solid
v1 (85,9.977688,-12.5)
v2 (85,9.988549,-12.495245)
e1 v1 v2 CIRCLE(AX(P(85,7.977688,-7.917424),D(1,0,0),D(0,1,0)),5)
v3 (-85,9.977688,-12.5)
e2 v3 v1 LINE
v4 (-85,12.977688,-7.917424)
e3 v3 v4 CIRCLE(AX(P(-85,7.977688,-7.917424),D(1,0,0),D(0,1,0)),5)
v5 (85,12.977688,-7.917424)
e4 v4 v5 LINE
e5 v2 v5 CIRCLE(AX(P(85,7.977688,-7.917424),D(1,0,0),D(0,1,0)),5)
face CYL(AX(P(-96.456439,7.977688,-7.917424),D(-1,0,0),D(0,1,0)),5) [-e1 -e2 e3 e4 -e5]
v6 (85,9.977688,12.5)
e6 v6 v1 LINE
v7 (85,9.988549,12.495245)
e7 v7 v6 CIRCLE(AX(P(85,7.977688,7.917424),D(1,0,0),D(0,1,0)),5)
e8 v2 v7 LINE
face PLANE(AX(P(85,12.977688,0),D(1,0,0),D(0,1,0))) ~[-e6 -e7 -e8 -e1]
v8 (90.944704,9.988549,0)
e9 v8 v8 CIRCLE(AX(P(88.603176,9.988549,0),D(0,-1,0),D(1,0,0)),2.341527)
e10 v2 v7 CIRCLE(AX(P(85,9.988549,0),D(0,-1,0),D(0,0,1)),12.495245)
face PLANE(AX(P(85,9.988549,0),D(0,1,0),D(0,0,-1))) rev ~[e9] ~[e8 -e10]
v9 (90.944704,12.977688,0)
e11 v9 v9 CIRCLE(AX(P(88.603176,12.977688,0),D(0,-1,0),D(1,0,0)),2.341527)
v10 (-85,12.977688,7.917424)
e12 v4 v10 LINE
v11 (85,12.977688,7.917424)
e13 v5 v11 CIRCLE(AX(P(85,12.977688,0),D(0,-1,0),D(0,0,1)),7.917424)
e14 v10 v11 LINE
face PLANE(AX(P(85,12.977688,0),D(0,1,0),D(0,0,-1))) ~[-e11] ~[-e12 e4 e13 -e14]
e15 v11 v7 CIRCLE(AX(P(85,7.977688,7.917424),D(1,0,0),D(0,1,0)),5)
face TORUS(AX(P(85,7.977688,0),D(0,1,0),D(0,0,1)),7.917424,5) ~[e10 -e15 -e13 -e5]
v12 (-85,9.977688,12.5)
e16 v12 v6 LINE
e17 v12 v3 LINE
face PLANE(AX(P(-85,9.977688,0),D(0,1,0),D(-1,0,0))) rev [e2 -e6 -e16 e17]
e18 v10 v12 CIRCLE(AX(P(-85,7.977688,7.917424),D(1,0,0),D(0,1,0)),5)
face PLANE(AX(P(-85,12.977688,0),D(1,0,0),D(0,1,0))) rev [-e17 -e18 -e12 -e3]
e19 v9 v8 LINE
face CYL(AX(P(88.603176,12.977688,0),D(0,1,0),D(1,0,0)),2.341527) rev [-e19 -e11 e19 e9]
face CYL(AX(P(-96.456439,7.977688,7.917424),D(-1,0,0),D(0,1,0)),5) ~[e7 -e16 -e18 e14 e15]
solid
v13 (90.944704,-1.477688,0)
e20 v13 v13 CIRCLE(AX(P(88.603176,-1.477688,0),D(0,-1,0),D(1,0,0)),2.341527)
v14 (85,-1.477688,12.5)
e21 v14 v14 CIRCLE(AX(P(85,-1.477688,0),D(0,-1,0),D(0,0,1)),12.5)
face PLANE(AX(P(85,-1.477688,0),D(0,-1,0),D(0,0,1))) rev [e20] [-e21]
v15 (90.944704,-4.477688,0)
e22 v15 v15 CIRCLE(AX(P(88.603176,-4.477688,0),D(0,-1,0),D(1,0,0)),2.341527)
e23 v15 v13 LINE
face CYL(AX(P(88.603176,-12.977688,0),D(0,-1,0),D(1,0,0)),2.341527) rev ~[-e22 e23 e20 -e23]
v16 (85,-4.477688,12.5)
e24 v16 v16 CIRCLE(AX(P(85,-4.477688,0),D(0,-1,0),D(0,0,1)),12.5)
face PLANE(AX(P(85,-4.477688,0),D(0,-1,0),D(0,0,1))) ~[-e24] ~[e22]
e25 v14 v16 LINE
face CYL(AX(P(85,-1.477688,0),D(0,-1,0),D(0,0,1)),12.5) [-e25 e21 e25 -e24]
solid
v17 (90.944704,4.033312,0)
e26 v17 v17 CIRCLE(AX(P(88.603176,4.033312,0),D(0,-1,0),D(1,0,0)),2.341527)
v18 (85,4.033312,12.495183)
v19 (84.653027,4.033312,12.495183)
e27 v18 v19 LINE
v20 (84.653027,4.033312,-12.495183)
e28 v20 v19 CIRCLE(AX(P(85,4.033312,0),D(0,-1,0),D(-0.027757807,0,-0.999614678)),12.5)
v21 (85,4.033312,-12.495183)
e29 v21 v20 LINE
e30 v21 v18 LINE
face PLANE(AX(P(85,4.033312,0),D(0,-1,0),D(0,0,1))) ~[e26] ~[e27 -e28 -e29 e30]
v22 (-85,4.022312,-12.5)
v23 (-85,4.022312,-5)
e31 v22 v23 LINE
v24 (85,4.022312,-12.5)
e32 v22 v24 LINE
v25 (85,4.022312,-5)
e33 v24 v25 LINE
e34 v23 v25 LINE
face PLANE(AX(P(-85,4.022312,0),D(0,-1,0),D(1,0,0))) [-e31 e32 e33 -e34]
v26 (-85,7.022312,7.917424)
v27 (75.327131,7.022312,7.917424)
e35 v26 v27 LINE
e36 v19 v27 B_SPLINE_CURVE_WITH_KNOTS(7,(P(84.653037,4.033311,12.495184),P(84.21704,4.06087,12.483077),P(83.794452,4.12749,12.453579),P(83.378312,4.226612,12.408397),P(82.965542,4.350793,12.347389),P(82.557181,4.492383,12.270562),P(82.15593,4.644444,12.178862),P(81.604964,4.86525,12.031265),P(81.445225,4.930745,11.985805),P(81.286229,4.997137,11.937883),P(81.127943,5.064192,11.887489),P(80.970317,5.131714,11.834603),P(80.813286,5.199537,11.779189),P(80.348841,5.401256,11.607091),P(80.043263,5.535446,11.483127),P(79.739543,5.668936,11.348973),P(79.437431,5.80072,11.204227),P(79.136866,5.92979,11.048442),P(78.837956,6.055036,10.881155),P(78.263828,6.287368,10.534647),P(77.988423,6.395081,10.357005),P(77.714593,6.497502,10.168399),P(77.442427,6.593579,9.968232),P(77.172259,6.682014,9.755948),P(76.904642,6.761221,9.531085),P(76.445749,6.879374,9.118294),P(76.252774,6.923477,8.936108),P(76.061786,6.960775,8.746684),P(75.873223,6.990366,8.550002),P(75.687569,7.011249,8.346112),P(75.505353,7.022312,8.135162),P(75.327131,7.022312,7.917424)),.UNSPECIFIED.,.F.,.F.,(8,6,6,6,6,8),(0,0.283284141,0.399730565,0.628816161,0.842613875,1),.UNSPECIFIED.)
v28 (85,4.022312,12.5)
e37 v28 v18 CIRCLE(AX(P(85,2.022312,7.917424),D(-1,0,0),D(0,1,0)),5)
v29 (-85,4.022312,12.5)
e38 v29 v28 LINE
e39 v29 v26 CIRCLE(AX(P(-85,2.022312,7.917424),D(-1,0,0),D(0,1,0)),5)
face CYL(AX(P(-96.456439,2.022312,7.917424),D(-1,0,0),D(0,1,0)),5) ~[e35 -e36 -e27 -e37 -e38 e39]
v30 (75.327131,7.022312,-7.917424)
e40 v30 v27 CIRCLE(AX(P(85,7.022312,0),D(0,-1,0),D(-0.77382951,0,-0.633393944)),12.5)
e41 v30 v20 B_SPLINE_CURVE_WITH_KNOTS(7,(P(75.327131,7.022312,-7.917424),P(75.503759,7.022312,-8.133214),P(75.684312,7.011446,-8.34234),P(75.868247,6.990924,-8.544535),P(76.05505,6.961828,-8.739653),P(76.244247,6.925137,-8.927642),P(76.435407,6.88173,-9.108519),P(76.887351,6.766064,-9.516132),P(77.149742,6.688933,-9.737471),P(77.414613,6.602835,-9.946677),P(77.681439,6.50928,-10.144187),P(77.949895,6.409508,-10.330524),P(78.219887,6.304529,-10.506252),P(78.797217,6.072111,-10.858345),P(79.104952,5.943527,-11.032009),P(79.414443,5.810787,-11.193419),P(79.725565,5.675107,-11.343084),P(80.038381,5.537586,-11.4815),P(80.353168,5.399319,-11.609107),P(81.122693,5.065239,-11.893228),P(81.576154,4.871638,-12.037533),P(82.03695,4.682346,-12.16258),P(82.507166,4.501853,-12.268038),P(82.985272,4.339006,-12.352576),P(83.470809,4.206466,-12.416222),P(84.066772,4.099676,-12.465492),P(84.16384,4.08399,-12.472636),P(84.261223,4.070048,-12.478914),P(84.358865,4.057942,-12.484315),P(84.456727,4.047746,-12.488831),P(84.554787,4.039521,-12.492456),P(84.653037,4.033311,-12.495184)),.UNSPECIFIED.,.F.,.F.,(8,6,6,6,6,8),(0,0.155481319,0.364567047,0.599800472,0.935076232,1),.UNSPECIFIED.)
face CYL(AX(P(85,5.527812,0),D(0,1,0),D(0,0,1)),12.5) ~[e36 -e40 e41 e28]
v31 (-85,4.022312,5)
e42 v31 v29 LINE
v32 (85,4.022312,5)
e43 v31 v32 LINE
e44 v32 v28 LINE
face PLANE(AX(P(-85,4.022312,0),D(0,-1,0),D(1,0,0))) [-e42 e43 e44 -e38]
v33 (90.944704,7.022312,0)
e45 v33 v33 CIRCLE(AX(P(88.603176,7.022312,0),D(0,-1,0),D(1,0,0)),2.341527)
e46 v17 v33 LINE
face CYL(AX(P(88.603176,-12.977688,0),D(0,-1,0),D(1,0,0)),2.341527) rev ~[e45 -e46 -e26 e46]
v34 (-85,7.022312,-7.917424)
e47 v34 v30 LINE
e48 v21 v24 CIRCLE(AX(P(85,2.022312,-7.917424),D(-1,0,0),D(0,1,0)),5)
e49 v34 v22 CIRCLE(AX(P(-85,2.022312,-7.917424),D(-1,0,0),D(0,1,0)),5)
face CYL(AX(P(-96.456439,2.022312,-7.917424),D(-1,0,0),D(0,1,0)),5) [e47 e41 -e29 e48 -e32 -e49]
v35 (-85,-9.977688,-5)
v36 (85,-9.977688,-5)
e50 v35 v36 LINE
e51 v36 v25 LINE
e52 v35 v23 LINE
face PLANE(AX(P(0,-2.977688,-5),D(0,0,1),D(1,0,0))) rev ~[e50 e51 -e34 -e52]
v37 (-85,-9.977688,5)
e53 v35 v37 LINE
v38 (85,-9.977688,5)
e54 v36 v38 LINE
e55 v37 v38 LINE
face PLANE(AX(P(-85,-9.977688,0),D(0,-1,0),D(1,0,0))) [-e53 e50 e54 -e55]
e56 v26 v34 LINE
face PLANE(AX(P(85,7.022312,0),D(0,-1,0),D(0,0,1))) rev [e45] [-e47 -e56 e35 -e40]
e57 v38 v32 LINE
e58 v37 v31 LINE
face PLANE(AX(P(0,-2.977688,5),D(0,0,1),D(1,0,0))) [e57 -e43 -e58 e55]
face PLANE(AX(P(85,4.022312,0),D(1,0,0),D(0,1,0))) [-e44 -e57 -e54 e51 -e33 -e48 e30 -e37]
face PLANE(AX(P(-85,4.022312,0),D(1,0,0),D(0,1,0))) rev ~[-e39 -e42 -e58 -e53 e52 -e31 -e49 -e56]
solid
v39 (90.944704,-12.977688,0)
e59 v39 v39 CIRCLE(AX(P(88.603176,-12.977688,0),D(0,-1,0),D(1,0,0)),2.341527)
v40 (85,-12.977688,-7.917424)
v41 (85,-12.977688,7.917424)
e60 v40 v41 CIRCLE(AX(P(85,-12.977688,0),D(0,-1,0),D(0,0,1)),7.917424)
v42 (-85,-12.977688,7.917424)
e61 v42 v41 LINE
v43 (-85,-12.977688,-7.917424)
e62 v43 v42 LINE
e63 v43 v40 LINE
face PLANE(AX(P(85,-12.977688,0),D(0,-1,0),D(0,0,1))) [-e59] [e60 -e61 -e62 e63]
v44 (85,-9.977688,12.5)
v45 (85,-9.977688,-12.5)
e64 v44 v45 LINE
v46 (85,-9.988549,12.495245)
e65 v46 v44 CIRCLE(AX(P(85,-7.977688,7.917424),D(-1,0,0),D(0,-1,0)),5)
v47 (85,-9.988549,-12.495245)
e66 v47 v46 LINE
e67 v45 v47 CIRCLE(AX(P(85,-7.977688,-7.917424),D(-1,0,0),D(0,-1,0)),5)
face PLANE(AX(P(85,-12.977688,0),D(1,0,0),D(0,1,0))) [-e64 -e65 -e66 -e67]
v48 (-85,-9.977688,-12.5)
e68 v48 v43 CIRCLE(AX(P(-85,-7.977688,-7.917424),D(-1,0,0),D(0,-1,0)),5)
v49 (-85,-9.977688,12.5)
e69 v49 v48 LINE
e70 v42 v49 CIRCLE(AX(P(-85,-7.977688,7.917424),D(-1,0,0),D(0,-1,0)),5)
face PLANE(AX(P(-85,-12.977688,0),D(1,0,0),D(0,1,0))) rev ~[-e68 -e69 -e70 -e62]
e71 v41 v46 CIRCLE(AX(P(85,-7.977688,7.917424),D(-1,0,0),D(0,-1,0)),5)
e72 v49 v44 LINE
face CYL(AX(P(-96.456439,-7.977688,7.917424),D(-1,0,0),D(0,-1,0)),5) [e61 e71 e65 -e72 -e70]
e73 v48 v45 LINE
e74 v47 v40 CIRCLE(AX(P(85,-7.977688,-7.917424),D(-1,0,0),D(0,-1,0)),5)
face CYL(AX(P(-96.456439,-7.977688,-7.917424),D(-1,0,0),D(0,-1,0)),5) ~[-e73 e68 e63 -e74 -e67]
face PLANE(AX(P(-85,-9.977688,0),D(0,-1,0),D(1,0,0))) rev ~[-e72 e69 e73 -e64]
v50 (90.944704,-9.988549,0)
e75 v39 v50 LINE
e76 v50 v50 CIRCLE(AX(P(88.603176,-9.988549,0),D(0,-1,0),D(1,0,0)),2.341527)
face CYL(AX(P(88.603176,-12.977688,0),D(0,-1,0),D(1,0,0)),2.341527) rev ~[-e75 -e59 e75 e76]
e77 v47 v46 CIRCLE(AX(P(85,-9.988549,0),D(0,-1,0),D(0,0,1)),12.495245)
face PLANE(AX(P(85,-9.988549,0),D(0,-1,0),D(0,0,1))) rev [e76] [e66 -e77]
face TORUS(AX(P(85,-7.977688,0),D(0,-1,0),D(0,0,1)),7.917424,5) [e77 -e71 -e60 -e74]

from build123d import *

# Parameters (mm, degrees)
F0_W          = 170
F0_H          = 3
F1_DEPTH      = 12.5
F0_H_2        = 14
F2_DEPTH      = 5
F3_DEPTH      = 12.5
F4_T1_DEPTH   = 192.9128784748
F4_2_T1_DEPTH = 192.9128784748
F5_W          = 2.989
F5_H          = 12.5
F5_W_2        = 1.5
F8_R          = 2.3415273596
F9_DEPTH      = 20.0010001


# Not quite as in the source:
# - a fillet or chamfer that OpenCascade refuses, or shapes differently, is made with other operations: its cross-section is extruded or revolved along the edge and cut away or added
# - a feature names something its author has since deleted; it is built from what else it names


with BuildPart() as f1:
    # F0 (on Top) → F1 (new body, symmetric)
    with BuildSketch(Plane.XY):
        with Locations((0, -11.4776883987)):
            Rectangle(F0_W, F0_H)
    extrude(amount=F1_DEPTH, both=True)

    # F4: fillet of radius 5 on 2 edges, made by hand

    # F4_s2 → F4_t1 (cut)
    with BuildSketch(Plane.YZ.offset(-96.4564392374)):
        with BuildLine():
            ThreePointArc((-12.9776883987, -7.917424305), (-12.1609885313, -10.6560370926), (-9.9776883987, -12.5))
            Line((-9.9776883987, -12.5), (-12.9776883987, -12.5))
            Line((-12.9776883987, -12.5), (-12.9776883987, -7.917424305))
        make_face()
        with BuildLine():
            ThreePointArc((-12.9776883987, 7.917424305), (-12.1609885313, 10.6560370926), (-9.9776883987, 12.5))
            Line((-9.9776883987, 12.5), (-12.9776883987, 12.5))
            Line((-12.9776883987, 12.5), (-12.9776883987, 7.917424305))
        make_face()
    extrude(amount=F4_T1_DEPTH, mode=Mode.SUBTRACT)

    # F5 (on face) → F6, piece 2 (revolve)
    with BuildSketch(Plane.YZ.offset(85)):
        with BuildLine():
            Line((-9.9885491654, 0), (-9.9885491654, 12.4952446354))
            ThreePointArc((-9.9885491654, 12.4952446354), (-12.1642325483, 10.6510753587), (-12.9776883987, 7.917424305))
            Line((-12.9776883987, 7.917424305), (-12.9776883987, 0))
            Line((-12.9776883987, 0), (-12.6429592585, 0))
            Line((-12.6429592585, 0), (-9.9885491654, 0))
        make_face()
    revolve(axis=Axis((85, -2.9776883987, 0), (0, -1, 0)))


with BuildPart() as f2:
    # F0 (on Top) → F2 (new body, symmetric)
    with BuildSketch(Plane.XY):
        with Locations((0, -2.9776883987)):
            Rectangle(F0_W, F0_H_2)
    extrude(amount=F2_DEPTH, both=True)

    # F0 (on Top) → F3 (join, symmetric)
    with BuildSketch(Plane.XY):
        with Locations((0, 5.5223116013)):
            Rectangle(F0_W, F0_H)
    extrude(amount=F3_DEPTH, both=True)

    # F4#2: fillet of radius 5 on 2 edges, made by hand

    # F4_2_s2 → F4_2_t1 (cut)
    with BuildSketch(Plane.YZ.offset(-96.4564392374)):
        with BuildLine():
            ThreePointArc((7.0223116013, -7.917424305), (6.205611734, -10.6560370926), (4.0223116013, -12.5))
            Line((4.0223116013, -12.5), (7.0223116013, -12.5))
            Line((7.0223116013, -12.5), (7.0223116013, -7.917424305))
        make_face()
        with BuildLine():
            ThreePointArc((7.0223116013, 7.917424305), (6.205611734, 10.6560370926), (4.0223116013, 12.5))
            Line((4.0223116013, 12.5), (7.0223116013, 12.5))
            Line((7.0223116013, 12.5), (7.0223116013, 7.917424305))
        make_face()
    extrude(amount=F4_2_T1_DEPTH, mode=Mode.SUBTRACT)

    # F5 (on face) → F6 (revolve)
    with BuildSketch(Plane.YZ.offset(85)):
        with Locations((5.5278116013, 6.25)):
            Rectangle(F5_W, F5_H)
    revolve(axis=Axis((85, -2.9776883987, 0), (0, -1, 0)))


with BuildPart() as f7:
    # F5 (on face) → F7 (revolve)
    with BuildSketch(Plane.YZ.offset(85)):
        with Locations((-2.2276883987, 6.25)):
            Rectangle(F5_W_2, F5_H)
        with Locations((-3.7276883987, 6.25)):
            Rectangle(F5_W_2, F5_H)
    revolve(axis=Axis((85, -2.9776883987, 0), (0, -1, 0)))


with BuildPart() as f9_tool:
    # F8 (on face) → F9 (new body, through all)
    with BuildSketch(Plane.XZ.offset(12.9776883987)):
        with Locations((88.6031761765, 0)):
            Circle(F8_R)
    extrude(amount=-F9_DEPTH)


with BuildPart() as f1_1:
    add(f1.part)

    # F9: cut by f9_tool
    add(f9_tool.part, mode=Mode.SUBTRACT)


with BuildPart() as f2_1:
    add(f2.part)

    # F9: cut by f9_tool
    add(f9_tool.part, mode=Mode.SUBTRACT)


with BuildPart() as f7_1:
    add(f7.part)

    # F9: cut by f9_tool
    add(f9_tool.part, mode=Mode.SUBTRACT)


with BuildPart() as f10_1:
    # F10: instance of F1
    add(f1_1.part.mirror(Plane.XZ))


solid = Compound([f1_1.part, f2_1.part, f7_1.part, f10_1.part])
